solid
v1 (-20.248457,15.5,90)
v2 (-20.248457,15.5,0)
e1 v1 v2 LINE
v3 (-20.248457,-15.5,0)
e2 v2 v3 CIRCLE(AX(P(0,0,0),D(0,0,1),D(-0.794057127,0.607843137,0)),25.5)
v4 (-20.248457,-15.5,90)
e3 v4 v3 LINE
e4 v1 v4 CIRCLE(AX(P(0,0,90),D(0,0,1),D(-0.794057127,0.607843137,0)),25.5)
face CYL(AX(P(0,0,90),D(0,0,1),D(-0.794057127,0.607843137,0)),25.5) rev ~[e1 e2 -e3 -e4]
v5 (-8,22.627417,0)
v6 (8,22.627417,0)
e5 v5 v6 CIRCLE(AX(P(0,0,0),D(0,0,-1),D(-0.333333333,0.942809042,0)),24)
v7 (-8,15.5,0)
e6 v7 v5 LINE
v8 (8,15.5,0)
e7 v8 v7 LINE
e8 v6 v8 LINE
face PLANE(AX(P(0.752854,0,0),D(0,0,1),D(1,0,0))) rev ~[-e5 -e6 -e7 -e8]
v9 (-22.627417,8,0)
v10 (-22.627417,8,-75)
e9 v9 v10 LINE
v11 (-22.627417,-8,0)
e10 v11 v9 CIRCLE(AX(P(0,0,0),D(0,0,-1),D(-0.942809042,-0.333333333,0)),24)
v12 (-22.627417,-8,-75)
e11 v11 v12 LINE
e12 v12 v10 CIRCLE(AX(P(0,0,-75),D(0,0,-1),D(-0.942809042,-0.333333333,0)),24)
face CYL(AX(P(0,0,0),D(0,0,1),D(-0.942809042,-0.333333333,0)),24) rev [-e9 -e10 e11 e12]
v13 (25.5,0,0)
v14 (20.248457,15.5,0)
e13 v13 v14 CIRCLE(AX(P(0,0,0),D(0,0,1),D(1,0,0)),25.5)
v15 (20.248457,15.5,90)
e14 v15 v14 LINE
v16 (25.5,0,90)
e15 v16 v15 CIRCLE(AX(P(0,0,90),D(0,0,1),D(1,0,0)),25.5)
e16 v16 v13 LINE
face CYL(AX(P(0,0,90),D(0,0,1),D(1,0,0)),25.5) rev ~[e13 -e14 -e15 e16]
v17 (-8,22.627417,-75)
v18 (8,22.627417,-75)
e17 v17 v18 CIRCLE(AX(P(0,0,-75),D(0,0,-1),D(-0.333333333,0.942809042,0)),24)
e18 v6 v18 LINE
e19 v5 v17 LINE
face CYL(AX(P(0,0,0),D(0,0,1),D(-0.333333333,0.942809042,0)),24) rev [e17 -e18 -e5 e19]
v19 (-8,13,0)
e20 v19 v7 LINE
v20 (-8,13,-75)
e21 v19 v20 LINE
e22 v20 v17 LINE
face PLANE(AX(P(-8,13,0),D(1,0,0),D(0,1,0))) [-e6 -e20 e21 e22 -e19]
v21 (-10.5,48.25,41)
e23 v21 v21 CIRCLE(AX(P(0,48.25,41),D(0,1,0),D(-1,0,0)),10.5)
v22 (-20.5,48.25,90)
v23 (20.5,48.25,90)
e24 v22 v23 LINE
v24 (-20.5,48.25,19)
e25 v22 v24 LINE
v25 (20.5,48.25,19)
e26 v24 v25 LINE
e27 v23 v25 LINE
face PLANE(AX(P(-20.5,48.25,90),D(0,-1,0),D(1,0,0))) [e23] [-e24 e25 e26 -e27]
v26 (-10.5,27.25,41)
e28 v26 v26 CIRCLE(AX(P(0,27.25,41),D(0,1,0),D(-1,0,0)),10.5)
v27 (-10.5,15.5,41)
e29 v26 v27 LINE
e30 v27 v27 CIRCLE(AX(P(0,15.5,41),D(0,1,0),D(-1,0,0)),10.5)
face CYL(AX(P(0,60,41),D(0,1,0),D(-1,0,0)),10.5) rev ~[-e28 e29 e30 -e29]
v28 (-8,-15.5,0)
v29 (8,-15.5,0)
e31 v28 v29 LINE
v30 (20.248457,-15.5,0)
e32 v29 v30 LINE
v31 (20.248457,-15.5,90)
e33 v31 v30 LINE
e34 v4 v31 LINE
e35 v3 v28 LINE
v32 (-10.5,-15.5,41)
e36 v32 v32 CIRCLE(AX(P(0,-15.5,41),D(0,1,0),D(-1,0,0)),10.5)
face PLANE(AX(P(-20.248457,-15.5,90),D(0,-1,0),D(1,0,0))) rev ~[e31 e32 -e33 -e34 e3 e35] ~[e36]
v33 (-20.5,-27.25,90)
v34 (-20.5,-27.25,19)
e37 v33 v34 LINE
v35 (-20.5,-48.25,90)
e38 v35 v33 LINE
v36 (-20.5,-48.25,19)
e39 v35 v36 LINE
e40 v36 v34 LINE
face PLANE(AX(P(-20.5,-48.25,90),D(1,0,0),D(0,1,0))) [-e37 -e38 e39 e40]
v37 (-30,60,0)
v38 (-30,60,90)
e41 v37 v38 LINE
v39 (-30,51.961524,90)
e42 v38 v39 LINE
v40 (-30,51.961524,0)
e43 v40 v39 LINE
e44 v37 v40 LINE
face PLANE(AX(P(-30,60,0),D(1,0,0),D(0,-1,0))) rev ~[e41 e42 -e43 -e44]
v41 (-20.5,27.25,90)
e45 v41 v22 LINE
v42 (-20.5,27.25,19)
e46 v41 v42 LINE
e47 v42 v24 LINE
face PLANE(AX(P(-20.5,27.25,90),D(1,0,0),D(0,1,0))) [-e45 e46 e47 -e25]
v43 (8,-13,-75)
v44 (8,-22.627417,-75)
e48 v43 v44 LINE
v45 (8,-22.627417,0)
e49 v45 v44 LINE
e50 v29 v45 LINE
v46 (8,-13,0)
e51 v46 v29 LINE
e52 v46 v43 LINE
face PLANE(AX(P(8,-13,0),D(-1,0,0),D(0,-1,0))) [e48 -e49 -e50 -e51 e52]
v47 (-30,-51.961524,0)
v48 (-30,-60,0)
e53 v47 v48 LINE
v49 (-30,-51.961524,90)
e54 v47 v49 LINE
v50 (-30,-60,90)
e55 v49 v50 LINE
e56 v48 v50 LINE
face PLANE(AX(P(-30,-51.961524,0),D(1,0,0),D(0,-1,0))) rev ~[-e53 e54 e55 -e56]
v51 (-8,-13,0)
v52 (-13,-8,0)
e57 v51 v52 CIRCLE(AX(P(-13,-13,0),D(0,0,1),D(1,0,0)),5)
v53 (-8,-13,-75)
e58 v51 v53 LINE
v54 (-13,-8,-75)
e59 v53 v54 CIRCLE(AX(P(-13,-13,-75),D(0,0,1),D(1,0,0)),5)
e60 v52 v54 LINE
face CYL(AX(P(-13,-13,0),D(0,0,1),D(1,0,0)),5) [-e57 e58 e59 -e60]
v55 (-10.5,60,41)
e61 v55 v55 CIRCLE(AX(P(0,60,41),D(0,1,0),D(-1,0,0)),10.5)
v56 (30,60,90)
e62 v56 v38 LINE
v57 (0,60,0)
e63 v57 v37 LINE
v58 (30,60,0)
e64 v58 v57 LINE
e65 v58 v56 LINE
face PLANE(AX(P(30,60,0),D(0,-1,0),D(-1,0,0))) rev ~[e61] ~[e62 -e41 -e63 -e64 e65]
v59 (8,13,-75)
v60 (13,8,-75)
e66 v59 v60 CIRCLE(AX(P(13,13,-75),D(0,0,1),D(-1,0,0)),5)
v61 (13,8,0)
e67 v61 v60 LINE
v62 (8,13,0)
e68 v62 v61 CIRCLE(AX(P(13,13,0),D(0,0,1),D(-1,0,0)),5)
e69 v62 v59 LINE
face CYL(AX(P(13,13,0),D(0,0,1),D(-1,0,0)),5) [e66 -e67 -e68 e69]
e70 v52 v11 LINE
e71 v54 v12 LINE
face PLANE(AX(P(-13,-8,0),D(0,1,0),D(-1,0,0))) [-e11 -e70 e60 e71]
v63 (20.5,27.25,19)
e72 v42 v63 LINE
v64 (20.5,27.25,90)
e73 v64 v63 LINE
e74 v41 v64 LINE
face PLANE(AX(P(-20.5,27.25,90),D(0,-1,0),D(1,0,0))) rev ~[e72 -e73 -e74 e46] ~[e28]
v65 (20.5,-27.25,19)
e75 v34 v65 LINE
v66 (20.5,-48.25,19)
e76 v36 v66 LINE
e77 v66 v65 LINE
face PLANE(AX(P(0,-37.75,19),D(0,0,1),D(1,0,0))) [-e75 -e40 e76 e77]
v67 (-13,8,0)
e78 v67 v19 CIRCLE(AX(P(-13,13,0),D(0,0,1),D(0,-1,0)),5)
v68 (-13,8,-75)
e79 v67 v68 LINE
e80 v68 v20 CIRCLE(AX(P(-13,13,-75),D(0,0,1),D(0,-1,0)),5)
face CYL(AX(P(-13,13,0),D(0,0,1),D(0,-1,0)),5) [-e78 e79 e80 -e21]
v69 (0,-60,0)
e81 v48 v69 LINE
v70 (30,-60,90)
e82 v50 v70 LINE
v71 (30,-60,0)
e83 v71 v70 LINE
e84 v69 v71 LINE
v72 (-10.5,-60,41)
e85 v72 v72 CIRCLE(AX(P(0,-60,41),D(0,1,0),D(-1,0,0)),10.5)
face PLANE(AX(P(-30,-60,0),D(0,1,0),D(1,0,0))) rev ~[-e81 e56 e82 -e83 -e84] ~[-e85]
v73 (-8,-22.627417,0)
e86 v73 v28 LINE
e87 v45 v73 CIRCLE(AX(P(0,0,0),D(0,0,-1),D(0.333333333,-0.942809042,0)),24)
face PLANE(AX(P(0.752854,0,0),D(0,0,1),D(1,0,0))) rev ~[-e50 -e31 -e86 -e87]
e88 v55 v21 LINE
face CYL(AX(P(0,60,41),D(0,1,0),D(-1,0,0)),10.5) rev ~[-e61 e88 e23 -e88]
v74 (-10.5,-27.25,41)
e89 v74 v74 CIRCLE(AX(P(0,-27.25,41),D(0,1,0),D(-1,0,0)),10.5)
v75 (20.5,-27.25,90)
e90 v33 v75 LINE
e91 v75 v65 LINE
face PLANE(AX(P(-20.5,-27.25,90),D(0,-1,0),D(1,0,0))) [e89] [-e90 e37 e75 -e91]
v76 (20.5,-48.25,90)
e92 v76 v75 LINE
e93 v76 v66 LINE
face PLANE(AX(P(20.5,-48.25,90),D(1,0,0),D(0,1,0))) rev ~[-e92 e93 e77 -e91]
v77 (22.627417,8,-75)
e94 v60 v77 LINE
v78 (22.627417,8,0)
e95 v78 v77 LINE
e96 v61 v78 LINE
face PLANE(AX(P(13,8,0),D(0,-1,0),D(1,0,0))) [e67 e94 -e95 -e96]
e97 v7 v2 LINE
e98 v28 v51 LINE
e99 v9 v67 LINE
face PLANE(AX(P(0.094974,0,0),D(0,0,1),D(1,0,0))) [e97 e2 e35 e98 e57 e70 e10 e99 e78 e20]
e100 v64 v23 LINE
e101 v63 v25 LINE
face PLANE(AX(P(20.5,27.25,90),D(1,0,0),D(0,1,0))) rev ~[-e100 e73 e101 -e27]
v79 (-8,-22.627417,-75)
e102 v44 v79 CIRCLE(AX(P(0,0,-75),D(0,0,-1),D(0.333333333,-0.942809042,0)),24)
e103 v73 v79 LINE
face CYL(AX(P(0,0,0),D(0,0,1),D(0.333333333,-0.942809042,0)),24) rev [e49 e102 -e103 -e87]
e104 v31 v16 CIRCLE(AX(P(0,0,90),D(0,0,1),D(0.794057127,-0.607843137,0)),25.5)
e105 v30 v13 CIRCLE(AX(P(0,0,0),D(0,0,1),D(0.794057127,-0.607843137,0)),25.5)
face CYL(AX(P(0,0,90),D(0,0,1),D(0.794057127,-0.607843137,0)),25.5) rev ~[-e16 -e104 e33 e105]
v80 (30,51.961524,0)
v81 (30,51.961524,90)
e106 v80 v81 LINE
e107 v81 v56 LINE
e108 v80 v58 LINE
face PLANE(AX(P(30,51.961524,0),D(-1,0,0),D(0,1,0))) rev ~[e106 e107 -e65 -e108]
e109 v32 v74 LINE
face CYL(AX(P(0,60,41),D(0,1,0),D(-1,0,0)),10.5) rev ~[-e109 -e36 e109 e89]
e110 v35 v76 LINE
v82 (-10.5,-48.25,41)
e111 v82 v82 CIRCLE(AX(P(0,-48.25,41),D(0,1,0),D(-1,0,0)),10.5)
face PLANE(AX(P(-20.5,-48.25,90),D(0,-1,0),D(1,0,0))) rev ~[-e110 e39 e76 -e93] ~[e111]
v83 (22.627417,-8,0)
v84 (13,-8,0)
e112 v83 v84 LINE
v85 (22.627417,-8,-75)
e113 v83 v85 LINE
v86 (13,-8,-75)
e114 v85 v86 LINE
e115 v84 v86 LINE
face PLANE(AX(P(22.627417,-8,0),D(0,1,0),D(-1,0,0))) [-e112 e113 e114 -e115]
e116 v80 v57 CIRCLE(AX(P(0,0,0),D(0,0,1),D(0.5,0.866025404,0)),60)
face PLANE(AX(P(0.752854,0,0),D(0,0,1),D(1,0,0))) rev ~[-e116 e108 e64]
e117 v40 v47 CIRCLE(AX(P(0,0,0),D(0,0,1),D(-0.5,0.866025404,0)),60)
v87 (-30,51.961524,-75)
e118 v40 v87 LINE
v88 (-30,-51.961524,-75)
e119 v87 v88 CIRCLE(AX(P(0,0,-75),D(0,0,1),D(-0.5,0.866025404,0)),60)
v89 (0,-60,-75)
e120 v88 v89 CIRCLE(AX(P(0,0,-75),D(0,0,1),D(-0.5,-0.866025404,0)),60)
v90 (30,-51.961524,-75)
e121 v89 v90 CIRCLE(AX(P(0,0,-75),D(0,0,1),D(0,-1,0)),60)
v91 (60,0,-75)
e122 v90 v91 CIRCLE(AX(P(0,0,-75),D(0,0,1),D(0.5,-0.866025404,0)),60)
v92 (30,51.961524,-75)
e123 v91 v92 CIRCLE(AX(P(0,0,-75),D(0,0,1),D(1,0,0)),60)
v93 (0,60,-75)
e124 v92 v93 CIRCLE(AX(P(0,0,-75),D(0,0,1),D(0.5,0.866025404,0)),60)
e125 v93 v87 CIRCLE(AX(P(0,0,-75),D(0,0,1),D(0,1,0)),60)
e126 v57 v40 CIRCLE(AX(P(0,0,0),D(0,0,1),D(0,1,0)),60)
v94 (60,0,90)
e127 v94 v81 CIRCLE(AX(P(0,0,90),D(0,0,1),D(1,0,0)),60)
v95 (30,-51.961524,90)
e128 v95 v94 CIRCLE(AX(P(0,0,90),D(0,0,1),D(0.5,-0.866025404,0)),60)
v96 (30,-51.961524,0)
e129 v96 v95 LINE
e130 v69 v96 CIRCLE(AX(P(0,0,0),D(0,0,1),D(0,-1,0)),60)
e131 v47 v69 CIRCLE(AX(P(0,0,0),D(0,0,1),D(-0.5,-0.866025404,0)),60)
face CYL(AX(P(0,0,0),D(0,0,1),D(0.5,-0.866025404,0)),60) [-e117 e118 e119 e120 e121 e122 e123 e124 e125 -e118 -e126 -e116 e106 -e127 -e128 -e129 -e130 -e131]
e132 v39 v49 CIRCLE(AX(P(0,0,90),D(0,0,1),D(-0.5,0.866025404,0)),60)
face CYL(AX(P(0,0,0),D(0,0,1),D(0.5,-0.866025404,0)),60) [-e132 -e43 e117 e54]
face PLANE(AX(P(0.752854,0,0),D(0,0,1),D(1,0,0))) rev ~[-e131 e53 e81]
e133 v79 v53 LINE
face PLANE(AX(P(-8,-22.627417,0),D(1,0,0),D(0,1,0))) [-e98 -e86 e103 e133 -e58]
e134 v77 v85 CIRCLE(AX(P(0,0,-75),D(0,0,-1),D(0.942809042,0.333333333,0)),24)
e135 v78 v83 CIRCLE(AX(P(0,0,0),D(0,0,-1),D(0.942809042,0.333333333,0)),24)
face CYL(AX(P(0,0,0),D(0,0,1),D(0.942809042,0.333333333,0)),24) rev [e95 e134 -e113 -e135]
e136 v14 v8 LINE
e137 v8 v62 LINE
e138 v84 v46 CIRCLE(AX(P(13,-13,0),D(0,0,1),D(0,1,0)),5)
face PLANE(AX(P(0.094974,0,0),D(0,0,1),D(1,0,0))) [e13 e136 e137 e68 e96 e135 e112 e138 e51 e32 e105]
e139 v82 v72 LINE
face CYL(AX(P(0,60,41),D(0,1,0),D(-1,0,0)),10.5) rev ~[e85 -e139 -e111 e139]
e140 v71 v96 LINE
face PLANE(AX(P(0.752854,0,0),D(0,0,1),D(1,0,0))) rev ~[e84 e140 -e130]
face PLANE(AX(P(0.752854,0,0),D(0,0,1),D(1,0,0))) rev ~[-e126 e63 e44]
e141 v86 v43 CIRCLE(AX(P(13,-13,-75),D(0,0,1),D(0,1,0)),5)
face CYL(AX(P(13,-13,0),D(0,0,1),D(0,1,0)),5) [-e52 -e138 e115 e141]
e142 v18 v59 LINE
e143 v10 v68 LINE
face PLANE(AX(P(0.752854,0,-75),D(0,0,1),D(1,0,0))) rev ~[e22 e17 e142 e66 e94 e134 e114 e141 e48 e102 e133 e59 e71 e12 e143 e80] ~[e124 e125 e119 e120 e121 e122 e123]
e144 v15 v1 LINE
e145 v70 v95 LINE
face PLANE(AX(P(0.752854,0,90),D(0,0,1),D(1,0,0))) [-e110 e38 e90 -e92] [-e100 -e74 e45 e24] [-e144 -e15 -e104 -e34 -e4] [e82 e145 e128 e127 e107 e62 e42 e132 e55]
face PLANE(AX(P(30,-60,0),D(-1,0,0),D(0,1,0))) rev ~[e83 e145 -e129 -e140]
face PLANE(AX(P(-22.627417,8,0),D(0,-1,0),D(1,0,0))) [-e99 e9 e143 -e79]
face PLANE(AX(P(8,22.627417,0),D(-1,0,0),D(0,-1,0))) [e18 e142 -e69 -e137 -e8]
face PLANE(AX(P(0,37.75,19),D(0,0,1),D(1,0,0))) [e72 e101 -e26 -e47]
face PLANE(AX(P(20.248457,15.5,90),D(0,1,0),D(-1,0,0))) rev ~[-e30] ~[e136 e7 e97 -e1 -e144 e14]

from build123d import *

# Parameters (mm, degrees)
F1_DEPTH = 90
F2_DEPTH = 75
F4_DEPTH = 90
F6_W     = 41
F6_H     = 21
F7_DEPTH = 71
F8_R     = 10.5
F9_DEPTH = 200


# Not quite as in the source:
# - a feature names something its author has since deleted; it is built from what else it names


with BuildPart() as f1:
    # F0 (on Top) → F1 (new body)
    with BuildSketch(Plane.XY):
        with BuildLine():
            ThreePointArc((30, -51.9615242271), (51.9615242271, -30), (60, 0))
            ThreePointArc((60, 0), (51.9615242271, 30), (30, 51.9615242271))
            ThreePointArc((30, 51.9615242271), (15.5291427062, 57.9555495773), (0, 60))
            ThreePointArc((0, 60), (-15.5291427062, 57.9555495773), (-30, 51.9615242271))
            ThreePointArc((-30, 51.9615242271), (-60, 0), (-30, -51.9615242271))
            ThreePointArc((-30, -51.9615242271), (-15.5291427062, -57.9555495773), (0, -60))
            ThreePointArc((0, -60), (15.5291427062, -57.9555495773), (30, -51.9615242271))
        make_face()
        with BuildLine():
            ThreePointArc((-8, 22.627416998), (0, 24), (8, 22.627416998))
            Line((8, 22.627416998), (8, 13))
            ThreePointArc((8, 13), (9.4644660941, 9.4644660941), (13, 8))
            Line((13, 8), (22.627416998, 8))
            ThreePointArc((22.627416998, 8), (24, 0), (22.627416998, -8))
            Line((22.627416998, -8), (13, -8))
            ThreePointArc((13, -8), (9.4644660941, -9.4644660941), (8, -13))
            Line((8, -13), (8, -22.627416998))
            ThreePointArc((8, -22.627416998), (0, -24), (-8, -22.627416998))
            Line((-8, -22.627416998), (-8, -13))
            ThreePointArc((-8, -13), (-9.4644660941, -9.4644660941), (-13, -8))
            Line((-13, -8), (-22.627416998, -8))
            ThreePointArc((-22.627416998, -8), (-24, 0), (-22.627416998, 8))
            Line((-22.627416998, 8), (-13, 8))
            ThreePointArc((-13, 8), (-9.4644660941, 9.4644660941), (-8, 13))
            Line((-8, 13), (-8, 22.627416998))
        make_face(mode=Mode.SUBTRACT)
        with BuildLine():
            ThreePointArc((0, 60), (15.5291427062, 57.9555495773), (30, 51.9615242271))
            Line((30, 51.9615242271), (30, 60))
            Line((30, 60), (0, 60))
        make_face()
        with BuildLine():
            Line((30, -60), (30, -51.9615242271))
            ThreePointArc((30, -51.9615242271), (15.5291427062, -57.9555495773), (0, -60))
            Line((0, -60), (30, -60))
        make_face()
        with BuildLine():
            ThreePointArc((-30, 51.9615242271), (-15.5291427062, 57.9555495773), (0, 60))
            Line((0, 60), (-30, 60))
            Line((-30, 60), (-30, 51.9615242271))
        make_face()
        with BuildLine():
            Line((-30, -60), (0, -60))
            ThreePointArc((0, -60), (-15.5291427062, -57.9555495773), (-30, -51.9615242271))
            Line((-30, -51.9615242271), (-30, -60))
        make_face()
        with BuildLine():
            Line((8, 13), (8, 22.627416998))
            ThreePointArc((8, 22.627416998), (0, 24), (-8, 22.627416998))
            Line((-8, 22.627416998), (-8, 13))
            ThreePointArc((-8, 13), (-9.4644660941, 9.4644660941), (-13, 8))
            Line((-13, 8), (-22.627416998, 8))
            ThreePointArc((-22.627416998, 8), (-24, 0), (-22.627416998, -8))
            Line((-22.627416998, -8), (-13, -8))
            ThreePointArc((-13, -8), (-9.4644660941, -9.4644660941), (-8, -13))
            Line((-8, -13), (-8, -22.627416998))
            ThreePointArc((-8, -22.627416998), (0, -24), (8, -22.627416998))
            Line((8, -22.627416998), (8, -13))
            ThreePointArc((8, -13), (9.4644660941, -9.4644660941), (13, -8))
            Line((13, -8), (22.627416998, -8))
            ThreePointArc((22.627416998, -8), (24, 0), (22.627416998, 8))
            Line((22.627416998, 8), (13, 8))
            ThreePointArc((13, 8), (9.4644660941, 9.4644660941), (8, 13))
        make_face()
    extrude(amount=F1_DEPTH)

    # F0 (on Top) → F2 (join)
    with BuildSketch(Plane.XY):
        with BuildLine():
            ThreePointArc((30, -51.9615242271), (51.9615242271, -30), (60, 0))
            ThreePointArc((60, 0), (51.9615242271, 30), (30, 51.9615242271))
            ThreePointArc((30, 51.9615242271), (15.5291427062, 57.9555495773), (0, 60))
            ThreePointArc((0, 60), (-15.5291427062, 57.9555495773), (-30, 51.9615242271))
            ThreePointArc((-30, 51.9615242271), (-60, 0), (-30, -51.9615242271))
            ThreePointArc((-30, -51.9615242271), (-15.5291427062, -57.9555495773), (0, -60))
            ThreePointArc((0, -60), (15.5291427062, -57.9555495773), (30, -51.9615242271))
        make_face()
        with BuildLine():
            ThreePointArc((-8, 22.627416998), (0, 24), (8, 22.627416998))
            Line((8, 22.627416998), (8, 13))
            ThreePointArc((8, 13), (9.4644660941, 9.4644660941), (13, 8))
            Line((13, 8), (22.627416998, 8))
            ThreePointArc((22.627416998, 8), (24, 0), (22.627416998, -8))
            Line((22.627416998, -8), (13, -8))
            ThreePointArc((13, -8), (9.4644660941, -9.4644660941), (8, -13))
            Line((8, -13), (8, -22.627416998))
            ThreePointArc((8, -22.627416998), (0, -24), (-8, -22.627416998))
            Line((-8, -22.627416998), (-8, -13))
            ThreePointArc((-8, -13), (-9.4644660941, -9.4644660941), (-13, -8))
            Line((-13, -8), (-22.627416998, -8))
            ThreePointArc((-22.627416998, -8), (-24, 0), (-22.627416998, 8))
            Line((-22.627416998, 8), (-13, 8))
            ThreePointArc((-13, 8), (-9.4644660941, 9.4644660941), (-8, 13))
            Line((-8, 13), (-8, 22.627416998))
        make_face(mode=Mode.SUBTRACT)
    extrude(amount=-F2_DEPTH)

    # F3 (on face) → F4 (cut)
    with BuildSketch(Plane.XY.offset(90)):
        with BuildLine():
            ThreePointArc((20.2484567313, -15.5), (24.1514559256, -8.1827365029), (25.5, 0))
            ThreePointArc((25.5, 0), (24.1514559256, 8.1827365029), (20.2484567313, 15.5))
            Line((20.2484567313, 15.5), (-20.2484567313, 15.5))
            ThreePointArc((-20.2484567313, 15.5), (-25.5, 0), (-20.2484567313, -15.5))
            Line((-20.2484567313, -15.5), (20.2484567313, -15.5))
        make_face()
    extrude(amount=-F4_DEPTH, mode=Mode.SUBTRACT)

    # F6 (on face) → F7 (cut)
    with BuildSketch(Plane.XY.offset(90)):
        with Locations((0, 37.75)):
            Rectangle(F6_W, F6_H)
        with Locations((0, -37.75)):
            Rectangle(F6_W, F6_H)
    extrude(amount=-F7_DEPTH, mode=Mode.SUBTRACT)

    # F8 (on face) → F9 (cut)
    with BuildSketch(Plane(origin=(0, 60, 0), x_dir=(-1, 0, 0), z_dir=(0, 1, 0))):
        with Locations((0, 41)):
            Circle(F8_R)
    extrude(amount=-F9_DEPTH, mode=Mode.SUBTRACT)


solid = f1.part
